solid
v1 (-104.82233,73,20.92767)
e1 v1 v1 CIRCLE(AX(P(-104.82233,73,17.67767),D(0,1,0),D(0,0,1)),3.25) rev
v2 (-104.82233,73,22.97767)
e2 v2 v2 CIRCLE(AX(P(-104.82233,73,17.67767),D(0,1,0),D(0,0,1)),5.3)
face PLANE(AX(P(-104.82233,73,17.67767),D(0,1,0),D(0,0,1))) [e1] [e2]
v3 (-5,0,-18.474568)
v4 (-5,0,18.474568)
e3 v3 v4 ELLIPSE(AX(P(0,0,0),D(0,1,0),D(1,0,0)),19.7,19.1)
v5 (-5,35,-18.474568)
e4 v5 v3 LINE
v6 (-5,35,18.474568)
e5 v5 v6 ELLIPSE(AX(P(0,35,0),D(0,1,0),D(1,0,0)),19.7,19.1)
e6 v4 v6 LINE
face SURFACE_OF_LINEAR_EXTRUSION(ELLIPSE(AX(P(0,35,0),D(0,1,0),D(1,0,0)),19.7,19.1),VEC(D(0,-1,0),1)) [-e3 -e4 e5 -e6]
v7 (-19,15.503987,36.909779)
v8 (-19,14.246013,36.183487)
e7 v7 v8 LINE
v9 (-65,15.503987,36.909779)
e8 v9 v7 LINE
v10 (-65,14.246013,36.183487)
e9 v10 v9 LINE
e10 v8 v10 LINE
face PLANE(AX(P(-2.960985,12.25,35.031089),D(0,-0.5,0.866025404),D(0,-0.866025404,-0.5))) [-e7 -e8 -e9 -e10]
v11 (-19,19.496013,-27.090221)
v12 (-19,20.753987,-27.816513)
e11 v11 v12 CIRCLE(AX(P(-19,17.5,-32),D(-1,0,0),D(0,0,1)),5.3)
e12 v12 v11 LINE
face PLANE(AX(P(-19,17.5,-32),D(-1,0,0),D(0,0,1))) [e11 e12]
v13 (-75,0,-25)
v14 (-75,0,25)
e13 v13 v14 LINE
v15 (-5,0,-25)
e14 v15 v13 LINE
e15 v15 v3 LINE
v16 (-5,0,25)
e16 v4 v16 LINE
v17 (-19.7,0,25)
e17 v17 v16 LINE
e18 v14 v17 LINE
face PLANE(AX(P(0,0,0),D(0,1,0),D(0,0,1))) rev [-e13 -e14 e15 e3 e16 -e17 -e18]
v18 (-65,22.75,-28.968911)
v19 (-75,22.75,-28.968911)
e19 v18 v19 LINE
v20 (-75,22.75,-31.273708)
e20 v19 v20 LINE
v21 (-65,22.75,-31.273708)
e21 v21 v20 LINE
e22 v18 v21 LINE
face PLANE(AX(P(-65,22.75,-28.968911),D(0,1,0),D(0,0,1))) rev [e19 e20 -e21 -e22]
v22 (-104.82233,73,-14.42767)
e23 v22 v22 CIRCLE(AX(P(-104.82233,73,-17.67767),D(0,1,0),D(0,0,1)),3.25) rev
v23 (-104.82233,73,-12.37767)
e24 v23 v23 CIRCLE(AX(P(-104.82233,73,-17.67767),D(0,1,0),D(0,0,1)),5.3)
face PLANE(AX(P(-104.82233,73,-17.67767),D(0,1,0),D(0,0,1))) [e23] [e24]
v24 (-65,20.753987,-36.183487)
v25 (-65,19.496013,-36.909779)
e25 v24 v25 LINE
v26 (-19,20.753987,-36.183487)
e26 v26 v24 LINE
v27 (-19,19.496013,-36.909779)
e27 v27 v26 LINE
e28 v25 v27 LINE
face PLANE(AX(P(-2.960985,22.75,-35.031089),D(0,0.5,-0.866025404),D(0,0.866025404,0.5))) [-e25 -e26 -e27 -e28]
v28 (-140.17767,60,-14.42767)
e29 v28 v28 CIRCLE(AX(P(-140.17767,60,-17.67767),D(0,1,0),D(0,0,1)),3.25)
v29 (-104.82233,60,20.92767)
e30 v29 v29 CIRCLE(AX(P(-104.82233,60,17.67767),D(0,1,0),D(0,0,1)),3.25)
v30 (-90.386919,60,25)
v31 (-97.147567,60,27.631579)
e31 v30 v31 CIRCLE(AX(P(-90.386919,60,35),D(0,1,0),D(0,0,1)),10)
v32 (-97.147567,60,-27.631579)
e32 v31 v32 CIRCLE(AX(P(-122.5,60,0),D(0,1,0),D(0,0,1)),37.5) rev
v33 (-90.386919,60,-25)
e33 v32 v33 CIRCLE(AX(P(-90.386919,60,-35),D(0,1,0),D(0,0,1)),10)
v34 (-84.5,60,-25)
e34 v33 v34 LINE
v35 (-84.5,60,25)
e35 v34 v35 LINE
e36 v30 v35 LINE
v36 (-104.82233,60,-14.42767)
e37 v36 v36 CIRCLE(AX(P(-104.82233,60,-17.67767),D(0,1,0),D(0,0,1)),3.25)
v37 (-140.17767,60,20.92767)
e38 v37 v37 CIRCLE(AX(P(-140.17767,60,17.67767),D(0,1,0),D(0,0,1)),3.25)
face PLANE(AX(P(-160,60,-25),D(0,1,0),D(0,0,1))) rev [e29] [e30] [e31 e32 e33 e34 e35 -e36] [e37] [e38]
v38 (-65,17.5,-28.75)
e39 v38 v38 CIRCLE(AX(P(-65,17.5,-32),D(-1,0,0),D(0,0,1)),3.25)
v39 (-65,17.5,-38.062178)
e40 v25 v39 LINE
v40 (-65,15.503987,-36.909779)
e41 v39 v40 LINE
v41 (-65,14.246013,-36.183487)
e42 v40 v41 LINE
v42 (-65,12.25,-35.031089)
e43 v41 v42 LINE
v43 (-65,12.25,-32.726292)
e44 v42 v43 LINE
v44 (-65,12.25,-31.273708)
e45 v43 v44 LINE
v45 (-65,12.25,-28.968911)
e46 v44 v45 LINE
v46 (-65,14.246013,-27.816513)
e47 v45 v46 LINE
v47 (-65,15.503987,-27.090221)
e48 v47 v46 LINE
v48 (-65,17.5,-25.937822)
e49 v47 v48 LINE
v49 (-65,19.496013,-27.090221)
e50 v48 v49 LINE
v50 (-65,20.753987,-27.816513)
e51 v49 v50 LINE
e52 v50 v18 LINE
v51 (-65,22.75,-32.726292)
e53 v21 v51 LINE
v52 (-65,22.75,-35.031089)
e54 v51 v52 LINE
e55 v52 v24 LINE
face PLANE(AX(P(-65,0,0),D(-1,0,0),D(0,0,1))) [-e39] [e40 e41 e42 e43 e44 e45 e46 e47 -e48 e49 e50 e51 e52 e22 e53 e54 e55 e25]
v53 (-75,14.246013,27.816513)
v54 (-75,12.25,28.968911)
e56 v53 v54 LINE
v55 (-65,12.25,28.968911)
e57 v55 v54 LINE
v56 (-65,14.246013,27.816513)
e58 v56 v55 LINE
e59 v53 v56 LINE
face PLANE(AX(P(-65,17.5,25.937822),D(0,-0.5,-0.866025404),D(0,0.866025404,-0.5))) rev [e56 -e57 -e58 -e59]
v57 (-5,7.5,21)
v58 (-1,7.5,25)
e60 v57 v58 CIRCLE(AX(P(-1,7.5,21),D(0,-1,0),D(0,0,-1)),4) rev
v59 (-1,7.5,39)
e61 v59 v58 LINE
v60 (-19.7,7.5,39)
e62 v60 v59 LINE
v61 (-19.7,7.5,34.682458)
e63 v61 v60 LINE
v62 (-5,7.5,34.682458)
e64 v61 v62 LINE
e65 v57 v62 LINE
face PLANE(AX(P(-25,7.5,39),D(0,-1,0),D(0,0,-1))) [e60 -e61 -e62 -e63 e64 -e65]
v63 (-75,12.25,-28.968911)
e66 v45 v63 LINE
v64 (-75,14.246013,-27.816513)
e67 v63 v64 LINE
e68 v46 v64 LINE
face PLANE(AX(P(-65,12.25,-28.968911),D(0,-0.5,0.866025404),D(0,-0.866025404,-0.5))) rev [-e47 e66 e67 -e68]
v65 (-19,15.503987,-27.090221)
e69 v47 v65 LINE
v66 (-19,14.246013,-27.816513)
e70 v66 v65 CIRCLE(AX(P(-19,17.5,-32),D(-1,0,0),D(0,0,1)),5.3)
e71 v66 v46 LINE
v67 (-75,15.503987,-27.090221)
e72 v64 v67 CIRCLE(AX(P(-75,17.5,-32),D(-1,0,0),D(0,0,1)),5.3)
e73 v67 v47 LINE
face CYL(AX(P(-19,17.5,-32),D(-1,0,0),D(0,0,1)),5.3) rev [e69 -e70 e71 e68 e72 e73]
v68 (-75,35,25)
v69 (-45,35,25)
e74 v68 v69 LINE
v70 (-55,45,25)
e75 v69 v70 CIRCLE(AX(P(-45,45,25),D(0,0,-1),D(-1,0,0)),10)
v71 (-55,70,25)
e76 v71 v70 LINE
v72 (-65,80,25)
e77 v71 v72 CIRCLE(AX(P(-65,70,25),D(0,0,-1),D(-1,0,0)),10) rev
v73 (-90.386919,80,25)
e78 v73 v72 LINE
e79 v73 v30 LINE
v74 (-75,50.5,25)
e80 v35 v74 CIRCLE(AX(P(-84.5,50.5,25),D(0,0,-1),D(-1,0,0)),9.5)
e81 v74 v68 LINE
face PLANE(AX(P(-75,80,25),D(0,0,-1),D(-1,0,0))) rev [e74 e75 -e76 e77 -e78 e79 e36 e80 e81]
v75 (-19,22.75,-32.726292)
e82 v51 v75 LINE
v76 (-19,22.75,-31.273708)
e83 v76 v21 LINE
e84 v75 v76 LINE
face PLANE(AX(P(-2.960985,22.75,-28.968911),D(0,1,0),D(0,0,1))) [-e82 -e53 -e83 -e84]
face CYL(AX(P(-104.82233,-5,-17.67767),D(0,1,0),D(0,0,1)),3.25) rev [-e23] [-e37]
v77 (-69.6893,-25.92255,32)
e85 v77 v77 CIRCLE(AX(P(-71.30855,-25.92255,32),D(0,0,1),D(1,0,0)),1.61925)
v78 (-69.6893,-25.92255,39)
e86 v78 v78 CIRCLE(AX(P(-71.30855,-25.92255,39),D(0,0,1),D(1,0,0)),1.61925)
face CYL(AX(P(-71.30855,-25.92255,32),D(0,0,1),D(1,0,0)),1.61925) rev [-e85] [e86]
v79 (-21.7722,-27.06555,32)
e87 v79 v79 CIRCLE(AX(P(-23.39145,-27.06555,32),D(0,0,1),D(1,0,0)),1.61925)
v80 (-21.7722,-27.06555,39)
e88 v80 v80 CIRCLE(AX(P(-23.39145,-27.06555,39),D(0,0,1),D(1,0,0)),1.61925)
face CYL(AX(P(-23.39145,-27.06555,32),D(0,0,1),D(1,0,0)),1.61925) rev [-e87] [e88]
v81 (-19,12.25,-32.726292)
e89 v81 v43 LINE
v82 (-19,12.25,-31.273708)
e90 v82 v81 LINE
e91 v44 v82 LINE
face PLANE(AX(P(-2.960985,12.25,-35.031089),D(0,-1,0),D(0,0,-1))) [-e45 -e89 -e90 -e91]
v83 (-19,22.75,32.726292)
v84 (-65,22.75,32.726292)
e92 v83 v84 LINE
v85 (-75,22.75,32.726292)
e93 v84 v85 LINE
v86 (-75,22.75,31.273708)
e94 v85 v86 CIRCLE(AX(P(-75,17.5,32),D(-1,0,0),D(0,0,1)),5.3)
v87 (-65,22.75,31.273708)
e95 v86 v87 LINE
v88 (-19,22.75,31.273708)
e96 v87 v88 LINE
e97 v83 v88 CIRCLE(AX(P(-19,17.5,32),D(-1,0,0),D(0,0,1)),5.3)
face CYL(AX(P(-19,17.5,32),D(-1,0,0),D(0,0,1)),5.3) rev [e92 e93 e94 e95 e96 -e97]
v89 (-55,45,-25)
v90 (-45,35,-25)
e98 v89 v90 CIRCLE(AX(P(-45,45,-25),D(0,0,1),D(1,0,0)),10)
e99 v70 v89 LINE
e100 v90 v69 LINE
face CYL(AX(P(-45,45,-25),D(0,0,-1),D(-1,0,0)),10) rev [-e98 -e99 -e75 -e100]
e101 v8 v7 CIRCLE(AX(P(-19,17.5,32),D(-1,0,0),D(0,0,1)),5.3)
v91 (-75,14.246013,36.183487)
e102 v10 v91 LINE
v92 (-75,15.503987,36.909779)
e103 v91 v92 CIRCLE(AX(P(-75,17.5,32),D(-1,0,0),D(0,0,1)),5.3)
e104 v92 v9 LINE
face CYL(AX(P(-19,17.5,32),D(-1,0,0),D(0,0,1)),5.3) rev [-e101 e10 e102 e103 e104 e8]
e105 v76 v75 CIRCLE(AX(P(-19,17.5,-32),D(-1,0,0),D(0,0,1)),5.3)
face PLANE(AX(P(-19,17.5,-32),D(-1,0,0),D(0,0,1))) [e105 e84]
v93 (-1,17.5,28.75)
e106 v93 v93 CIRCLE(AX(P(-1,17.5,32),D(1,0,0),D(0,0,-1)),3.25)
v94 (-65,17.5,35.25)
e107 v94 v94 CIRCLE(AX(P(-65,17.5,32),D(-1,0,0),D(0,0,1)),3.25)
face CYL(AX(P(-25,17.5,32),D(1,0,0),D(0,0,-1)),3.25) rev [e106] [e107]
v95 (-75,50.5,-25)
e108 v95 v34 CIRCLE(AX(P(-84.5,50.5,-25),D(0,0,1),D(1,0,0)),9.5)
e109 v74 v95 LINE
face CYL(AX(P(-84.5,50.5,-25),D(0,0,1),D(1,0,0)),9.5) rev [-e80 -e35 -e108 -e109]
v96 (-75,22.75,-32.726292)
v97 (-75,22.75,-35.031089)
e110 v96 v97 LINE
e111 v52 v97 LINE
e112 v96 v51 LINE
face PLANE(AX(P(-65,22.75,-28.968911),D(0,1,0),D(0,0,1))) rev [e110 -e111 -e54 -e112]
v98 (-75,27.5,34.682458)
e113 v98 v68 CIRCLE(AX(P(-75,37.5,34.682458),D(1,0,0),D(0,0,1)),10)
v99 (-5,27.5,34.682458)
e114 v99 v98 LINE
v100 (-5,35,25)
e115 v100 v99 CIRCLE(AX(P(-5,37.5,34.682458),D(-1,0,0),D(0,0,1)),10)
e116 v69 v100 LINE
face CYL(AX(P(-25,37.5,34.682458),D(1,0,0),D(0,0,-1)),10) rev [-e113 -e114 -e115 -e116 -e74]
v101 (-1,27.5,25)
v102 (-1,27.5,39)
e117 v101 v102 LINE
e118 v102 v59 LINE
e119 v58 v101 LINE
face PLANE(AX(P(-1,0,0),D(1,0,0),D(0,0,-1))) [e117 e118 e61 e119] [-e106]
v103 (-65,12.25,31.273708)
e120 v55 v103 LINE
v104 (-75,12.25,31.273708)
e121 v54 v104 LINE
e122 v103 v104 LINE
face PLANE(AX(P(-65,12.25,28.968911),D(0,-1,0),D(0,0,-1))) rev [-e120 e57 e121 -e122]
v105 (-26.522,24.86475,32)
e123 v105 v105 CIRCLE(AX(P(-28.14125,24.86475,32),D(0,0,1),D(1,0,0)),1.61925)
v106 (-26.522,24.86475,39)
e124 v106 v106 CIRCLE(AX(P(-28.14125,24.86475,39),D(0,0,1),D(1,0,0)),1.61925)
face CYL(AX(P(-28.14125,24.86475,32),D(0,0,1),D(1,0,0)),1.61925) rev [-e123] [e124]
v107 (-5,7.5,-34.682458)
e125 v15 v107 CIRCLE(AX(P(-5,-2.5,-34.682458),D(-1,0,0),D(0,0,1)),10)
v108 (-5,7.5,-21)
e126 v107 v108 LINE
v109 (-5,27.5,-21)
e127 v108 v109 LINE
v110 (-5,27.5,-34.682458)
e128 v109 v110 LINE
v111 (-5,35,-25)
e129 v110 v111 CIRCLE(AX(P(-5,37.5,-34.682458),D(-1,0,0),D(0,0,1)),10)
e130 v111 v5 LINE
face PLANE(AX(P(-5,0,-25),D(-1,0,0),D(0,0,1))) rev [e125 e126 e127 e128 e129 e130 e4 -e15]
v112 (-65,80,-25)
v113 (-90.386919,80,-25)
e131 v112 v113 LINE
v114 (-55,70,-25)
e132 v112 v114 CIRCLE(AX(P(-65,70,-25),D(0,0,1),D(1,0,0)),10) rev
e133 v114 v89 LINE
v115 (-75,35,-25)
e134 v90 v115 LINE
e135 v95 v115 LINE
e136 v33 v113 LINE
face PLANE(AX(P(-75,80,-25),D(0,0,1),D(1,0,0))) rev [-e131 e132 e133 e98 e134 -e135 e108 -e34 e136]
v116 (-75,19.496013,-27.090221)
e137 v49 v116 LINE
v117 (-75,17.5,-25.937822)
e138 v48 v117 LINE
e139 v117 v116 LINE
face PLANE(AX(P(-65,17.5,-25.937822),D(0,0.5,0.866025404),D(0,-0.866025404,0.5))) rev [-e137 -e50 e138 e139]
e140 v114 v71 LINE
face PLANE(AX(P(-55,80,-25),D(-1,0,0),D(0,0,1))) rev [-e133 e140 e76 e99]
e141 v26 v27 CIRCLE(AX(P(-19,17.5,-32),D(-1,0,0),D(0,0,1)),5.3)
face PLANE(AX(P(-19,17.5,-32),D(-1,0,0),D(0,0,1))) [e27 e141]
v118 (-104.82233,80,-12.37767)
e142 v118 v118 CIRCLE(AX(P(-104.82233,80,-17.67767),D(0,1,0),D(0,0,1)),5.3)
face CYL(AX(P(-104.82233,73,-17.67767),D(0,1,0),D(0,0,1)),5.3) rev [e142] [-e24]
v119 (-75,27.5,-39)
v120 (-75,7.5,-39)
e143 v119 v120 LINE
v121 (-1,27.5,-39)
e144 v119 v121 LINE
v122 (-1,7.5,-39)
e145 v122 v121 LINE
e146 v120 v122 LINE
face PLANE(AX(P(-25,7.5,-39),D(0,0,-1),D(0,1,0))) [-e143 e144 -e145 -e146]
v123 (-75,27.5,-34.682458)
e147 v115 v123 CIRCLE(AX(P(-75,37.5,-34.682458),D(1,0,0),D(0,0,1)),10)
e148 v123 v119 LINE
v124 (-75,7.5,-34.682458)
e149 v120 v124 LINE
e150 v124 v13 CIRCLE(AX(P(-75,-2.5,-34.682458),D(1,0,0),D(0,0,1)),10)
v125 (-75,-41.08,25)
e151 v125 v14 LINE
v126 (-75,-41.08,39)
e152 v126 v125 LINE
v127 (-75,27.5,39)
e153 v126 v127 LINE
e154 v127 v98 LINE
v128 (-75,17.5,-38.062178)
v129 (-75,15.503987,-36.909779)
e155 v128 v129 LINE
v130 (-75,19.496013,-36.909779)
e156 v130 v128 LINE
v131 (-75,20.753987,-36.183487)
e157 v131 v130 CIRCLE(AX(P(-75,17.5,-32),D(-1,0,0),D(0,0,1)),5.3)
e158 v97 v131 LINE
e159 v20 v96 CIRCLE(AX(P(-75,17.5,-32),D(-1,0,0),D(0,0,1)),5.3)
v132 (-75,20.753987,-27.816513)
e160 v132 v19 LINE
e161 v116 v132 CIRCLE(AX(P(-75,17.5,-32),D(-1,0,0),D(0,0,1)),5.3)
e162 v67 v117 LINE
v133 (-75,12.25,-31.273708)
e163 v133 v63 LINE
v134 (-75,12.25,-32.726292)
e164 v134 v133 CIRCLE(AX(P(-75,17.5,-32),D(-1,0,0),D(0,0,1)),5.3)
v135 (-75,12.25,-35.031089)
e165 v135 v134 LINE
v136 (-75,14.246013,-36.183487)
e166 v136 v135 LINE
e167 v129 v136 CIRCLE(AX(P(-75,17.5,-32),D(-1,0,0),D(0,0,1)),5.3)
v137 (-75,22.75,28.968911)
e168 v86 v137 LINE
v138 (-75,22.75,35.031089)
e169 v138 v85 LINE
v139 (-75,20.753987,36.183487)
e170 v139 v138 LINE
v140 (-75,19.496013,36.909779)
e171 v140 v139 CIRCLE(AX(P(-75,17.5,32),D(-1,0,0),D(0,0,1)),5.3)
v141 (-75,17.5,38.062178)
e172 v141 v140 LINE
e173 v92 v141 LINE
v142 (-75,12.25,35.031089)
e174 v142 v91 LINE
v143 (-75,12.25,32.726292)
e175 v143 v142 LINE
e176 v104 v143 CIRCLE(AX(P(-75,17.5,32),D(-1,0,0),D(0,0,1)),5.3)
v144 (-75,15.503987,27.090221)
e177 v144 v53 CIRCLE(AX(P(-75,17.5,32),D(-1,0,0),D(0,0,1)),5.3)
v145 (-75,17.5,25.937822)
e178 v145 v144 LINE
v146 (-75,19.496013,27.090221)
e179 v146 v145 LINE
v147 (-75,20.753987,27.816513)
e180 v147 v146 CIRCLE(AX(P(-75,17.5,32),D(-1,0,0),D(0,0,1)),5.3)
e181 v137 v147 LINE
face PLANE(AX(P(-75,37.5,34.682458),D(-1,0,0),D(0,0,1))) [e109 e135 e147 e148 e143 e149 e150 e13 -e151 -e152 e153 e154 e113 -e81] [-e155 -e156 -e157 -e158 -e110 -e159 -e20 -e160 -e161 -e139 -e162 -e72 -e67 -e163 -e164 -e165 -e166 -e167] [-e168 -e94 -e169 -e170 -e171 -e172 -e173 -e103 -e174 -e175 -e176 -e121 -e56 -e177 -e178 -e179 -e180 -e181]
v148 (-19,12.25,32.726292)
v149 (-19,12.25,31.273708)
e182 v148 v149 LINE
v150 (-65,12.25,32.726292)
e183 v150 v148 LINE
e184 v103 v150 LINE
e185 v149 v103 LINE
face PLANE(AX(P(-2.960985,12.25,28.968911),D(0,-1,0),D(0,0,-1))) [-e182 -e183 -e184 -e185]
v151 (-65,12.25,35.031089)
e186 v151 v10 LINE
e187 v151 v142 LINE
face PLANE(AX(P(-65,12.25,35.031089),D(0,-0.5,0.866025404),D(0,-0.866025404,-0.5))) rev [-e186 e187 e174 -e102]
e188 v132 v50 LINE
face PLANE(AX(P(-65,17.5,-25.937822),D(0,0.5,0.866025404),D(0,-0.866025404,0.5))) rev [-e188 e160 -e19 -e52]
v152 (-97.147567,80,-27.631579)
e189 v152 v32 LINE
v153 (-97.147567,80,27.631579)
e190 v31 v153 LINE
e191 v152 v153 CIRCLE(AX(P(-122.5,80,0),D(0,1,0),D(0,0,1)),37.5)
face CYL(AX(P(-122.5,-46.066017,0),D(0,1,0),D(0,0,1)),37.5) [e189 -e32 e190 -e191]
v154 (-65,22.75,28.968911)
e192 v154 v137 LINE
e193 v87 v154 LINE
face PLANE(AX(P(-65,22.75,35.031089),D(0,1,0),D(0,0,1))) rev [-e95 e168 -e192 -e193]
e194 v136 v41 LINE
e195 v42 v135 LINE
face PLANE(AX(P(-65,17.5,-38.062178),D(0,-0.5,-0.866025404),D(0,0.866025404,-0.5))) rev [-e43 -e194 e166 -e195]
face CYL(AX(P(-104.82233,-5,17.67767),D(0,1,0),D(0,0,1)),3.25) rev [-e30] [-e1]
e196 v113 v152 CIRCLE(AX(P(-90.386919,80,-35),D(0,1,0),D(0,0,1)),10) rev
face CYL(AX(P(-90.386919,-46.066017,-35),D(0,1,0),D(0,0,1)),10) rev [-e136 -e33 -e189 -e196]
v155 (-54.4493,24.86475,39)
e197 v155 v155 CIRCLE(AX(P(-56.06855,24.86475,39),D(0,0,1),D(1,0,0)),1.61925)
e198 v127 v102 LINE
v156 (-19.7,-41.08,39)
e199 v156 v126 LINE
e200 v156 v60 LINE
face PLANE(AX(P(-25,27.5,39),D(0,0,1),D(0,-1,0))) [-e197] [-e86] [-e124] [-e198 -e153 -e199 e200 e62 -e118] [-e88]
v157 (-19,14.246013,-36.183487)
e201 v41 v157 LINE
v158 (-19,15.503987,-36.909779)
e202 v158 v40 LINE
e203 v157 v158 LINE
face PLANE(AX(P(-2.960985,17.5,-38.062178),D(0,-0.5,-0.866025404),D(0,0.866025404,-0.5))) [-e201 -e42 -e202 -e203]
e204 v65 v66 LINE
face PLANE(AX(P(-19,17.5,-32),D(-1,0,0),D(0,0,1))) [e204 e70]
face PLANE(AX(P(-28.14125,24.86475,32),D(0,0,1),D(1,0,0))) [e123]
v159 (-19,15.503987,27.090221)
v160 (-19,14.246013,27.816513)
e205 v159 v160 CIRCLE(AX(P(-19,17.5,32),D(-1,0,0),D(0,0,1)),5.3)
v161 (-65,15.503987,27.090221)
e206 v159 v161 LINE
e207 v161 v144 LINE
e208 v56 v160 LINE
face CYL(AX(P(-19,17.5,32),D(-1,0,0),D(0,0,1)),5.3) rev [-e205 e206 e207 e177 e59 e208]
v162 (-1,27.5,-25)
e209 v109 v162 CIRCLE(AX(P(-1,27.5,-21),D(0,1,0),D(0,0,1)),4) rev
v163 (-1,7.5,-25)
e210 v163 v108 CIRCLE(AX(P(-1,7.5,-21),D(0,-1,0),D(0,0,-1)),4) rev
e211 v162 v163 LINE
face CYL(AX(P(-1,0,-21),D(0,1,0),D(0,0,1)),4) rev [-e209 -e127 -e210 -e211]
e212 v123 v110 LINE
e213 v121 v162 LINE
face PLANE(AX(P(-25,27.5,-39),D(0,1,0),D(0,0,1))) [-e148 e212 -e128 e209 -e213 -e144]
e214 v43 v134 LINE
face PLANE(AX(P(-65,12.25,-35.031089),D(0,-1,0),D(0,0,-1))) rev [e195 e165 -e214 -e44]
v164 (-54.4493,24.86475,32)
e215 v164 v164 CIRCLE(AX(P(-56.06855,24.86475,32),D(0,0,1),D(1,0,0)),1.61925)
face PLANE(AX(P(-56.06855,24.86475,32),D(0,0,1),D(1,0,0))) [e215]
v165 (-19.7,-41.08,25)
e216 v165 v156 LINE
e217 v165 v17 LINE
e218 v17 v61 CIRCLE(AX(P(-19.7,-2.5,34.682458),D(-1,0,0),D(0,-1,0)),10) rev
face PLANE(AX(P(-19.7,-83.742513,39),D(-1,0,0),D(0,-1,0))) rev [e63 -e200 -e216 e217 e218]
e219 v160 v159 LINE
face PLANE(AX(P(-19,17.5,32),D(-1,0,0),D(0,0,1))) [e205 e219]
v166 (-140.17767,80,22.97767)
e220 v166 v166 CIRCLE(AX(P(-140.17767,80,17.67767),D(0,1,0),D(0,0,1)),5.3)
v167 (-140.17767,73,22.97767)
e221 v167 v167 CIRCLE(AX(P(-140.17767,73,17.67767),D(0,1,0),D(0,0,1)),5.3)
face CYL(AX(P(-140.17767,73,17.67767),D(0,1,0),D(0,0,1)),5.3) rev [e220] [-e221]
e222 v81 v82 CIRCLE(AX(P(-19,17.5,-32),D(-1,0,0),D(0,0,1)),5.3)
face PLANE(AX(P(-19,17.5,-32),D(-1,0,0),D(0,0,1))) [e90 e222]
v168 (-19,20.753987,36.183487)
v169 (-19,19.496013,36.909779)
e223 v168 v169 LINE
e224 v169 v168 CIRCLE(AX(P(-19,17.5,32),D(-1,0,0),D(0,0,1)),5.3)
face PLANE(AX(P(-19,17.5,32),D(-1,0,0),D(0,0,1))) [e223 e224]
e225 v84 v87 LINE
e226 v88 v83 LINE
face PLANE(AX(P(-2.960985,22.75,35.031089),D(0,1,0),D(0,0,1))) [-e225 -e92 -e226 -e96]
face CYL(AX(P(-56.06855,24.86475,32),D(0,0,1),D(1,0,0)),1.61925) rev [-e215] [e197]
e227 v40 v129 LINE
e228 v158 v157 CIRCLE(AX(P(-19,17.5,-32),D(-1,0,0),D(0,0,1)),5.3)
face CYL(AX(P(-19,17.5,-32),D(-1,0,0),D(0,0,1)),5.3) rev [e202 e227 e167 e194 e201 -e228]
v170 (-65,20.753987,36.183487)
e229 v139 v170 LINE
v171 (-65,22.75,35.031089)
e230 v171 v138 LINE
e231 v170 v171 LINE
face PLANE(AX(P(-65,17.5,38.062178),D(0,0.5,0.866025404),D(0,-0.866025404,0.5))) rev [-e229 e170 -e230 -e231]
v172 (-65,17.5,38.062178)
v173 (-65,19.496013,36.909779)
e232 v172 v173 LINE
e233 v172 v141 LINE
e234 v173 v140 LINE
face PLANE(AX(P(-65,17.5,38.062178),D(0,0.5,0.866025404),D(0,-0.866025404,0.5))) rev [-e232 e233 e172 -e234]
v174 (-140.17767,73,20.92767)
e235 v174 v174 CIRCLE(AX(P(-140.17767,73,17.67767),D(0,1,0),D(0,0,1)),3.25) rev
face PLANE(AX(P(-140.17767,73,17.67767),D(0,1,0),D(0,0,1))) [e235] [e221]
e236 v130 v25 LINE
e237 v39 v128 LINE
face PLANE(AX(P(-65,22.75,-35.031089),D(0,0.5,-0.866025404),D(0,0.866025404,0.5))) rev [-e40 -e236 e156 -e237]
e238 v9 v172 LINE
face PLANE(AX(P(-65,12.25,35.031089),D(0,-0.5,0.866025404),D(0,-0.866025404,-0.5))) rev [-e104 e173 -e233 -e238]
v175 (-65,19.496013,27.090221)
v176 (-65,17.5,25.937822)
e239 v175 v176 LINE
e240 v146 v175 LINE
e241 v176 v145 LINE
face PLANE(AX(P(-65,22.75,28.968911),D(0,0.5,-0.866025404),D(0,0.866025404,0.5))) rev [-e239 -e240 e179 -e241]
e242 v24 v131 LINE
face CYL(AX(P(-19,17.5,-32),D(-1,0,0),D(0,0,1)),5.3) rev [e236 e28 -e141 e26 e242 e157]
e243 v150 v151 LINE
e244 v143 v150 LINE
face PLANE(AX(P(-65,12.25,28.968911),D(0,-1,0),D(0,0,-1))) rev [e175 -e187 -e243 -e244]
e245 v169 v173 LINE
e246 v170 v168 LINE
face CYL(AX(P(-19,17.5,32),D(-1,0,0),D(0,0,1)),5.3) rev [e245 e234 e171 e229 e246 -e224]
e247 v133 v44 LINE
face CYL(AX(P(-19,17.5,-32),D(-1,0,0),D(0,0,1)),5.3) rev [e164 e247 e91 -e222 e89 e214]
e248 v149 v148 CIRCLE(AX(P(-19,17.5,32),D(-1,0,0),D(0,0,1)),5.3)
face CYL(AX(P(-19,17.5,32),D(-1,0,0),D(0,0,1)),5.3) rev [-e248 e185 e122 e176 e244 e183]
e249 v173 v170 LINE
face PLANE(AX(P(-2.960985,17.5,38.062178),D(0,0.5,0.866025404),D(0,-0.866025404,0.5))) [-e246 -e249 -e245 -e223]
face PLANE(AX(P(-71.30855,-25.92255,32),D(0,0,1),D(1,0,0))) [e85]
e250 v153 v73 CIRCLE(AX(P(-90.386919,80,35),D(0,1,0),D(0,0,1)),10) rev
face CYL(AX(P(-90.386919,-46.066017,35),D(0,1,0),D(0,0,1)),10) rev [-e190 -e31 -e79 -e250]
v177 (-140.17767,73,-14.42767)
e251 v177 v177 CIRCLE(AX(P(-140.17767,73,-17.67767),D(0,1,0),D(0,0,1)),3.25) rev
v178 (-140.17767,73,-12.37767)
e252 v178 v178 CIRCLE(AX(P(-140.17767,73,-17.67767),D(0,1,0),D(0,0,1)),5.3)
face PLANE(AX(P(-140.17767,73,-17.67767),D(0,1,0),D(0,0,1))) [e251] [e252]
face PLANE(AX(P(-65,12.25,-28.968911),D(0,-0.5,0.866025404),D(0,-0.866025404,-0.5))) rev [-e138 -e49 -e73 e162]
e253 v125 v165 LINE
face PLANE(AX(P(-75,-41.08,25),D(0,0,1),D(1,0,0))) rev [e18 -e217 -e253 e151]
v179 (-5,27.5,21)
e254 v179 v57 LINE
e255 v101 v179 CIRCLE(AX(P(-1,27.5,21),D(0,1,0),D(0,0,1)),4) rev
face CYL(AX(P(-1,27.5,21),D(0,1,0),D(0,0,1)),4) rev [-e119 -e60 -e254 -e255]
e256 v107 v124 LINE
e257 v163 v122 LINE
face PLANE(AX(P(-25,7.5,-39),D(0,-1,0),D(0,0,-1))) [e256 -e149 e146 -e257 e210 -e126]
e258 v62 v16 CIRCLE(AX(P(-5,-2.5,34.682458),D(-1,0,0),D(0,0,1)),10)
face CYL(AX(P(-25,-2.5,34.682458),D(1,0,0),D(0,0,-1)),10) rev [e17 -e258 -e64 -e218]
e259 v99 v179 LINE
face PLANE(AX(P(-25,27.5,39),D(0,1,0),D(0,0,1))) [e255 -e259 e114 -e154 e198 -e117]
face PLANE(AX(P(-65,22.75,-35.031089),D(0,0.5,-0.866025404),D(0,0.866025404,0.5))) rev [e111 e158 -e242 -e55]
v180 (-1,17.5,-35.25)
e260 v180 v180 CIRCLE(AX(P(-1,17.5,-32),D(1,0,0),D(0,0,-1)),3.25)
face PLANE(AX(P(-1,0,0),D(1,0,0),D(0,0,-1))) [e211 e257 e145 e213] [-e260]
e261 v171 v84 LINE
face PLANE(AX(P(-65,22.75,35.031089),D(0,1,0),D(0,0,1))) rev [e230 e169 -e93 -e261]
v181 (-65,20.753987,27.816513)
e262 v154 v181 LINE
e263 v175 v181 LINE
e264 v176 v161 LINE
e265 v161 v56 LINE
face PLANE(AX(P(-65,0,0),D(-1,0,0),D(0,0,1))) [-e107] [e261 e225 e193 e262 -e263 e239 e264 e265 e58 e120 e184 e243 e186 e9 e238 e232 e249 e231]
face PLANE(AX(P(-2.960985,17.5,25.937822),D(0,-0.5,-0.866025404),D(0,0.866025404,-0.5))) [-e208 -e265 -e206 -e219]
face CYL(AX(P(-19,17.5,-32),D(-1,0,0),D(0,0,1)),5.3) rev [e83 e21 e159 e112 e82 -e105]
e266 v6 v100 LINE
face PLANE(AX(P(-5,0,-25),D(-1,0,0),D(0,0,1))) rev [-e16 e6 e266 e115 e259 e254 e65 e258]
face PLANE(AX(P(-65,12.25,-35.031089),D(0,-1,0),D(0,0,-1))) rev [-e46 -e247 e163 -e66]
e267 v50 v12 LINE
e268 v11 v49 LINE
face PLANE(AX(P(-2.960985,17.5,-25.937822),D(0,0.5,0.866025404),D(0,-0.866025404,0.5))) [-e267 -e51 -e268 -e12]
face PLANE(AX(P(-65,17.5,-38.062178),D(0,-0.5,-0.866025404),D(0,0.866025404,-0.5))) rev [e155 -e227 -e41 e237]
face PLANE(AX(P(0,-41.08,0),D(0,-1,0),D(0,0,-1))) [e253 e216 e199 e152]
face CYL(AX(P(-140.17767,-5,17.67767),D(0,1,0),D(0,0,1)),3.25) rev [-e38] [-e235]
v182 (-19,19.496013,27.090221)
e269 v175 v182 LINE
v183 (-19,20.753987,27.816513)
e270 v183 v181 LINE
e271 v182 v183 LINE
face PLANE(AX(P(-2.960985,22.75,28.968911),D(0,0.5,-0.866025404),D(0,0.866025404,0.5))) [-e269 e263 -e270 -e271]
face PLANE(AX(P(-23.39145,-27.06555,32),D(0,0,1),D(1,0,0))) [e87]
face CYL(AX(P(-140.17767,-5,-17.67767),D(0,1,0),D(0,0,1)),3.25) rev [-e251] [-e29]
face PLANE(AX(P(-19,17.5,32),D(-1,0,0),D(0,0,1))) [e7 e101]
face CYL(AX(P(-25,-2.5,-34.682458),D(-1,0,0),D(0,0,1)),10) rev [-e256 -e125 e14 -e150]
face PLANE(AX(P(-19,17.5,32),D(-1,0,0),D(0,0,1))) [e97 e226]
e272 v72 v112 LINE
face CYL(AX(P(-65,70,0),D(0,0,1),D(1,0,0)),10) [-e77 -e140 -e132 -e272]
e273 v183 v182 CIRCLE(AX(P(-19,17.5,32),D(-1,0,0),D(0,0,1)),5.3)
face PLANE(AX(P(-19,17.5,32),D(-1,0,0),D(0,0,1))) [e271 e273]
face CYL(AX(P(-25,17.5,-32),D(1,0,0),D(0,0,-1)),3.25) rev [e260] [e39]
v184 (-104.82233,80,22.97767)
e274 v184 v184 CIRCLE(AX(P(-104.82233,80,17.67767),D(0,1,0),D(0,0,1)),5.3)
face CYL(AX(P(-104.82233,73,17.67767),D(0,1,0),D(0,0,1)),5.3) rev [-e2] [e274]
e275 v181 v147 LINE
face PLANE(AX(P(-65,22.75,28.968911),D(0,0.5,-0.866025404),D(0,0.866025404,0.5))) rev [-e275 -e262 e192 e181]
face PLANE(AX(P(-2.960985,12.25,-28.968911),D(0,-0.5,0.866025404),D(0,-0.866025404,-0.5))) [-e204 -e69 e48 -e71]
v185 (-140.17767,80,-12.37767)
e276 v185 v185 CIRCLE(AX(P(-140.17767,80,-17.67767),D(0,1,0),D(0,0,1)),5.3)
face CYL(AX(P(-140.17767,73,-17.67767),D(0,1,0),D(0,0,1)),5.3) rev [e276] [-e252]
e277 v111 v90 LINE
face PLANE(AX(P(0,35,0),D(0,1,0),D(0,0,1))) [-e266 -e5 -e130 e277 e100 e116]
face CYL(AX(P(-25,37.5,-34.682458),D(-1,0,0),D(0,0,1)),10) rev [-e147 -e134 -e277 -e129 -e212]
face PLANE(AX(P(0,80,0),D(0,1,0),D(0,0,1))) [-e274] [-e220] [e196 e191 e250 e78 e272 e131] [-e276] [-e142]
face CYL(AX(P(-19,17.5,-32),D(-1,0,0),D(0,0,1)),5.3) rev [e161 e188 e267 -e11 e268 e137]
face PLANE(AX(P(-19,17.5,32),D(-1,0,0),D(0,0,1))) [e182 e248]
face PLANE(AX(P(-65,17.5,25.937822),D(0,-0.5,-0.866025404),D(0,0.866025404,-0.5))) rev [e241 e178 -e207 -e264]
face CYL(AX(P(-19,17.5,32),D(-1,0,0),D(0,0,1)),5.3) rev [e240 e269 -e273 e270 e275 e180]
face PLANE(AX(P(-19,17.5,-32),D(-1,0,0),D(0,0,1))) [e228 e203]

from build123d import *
from build123d.topology import SkipClean

# Parameters (mm, degrees)
SKETCH1_W                = 50
SKETCH1_H                = 50
SKETCH1_RX               = 19.7
SKETCH1_RY               = 19.1
BOSS_EXTRUDE1_DEPTH      = 35
SKETCH2_W                = 30
SKETCH2_H                = 50
CUT_EXTRUDE1_DEPTH       = 35
SKETCH3_W                = 13
SKETCH3_H                = 50
BOSS_EXTRUDE2_DEPTH      = 20
SKETCH4_R                = 1.5
CUT_EXTRUDE2_DEPTH       = 64.639610377
SKETCH5_W                = 36.974567712
SKETCH5_H                = 20
CUT_EXTRUDE3_DEPTH       = 20
BOSS_EXTRUDE3_DEPTH      = 4
BOSS_EXTRUDE3_DEPTH_BACK = 20
SKETCH6_W                = 14
SKETCH6_H                = 20
SKETCH6_R                = 3.25
SKETCH7_R                = 5.3
SKETCH7_R_2              = 3
CUT_EXTRUDE4_DEPTH       = 6
SKETCH8_W                = 13
SKETCH8_H                = 13.025432288
CUT_EXTRUDE5_DEPTH       = 30
FILLET6_R                = 4
FILLET5_R                = 10
SKETCH9_R                = 5.3
BOSS_EXTRUDE4_DEPTH      = 50
SKETCH10_W               = 20
SKETCH10_H               = 50
BOSS_EXTRUDE5_DEPTH      = 45
FILLET7_R                = 10
SKETCH11_W               = 50
SKETCH11_H               = 20
BOSS_EXTRUDE6_DEPTH      = 85
SKETCH13_R               = 37.5
BOSS_EXTRUDE7_DEPTH      = 20
FILLET8_R                = 9.5
CUT_EXTRUDE6_DEPTH       = 85
FILLET9_R                = 10
FILLET10_R               = 10
SKETCH14_R               = 3.25
CUT_EXTRUDE7_DEPTH       = 85
SKETCH15_R               = 5.3
CUT_EXTRUDE8_DEPTH       = 7
SKETCH16_R               = 3.25
BOSS_EXTRUDE9_DEPTH      = 56
SKETCH16_3_R             = 3.25
CUT_EXTRUDE11_DEPTH      = 10
SKETCH17_W               = 15
SKETCH17_H               = 14
BOSS_EXTRUDE10_DEPTH     = 7.5
SKETCH18_W               = 15
SKETCH18_H               = 14
BOSS_EXTRUDE11_DEPTH     = 41.08
BOSS_EXTRUDE12_REACH     = 181.937
SKETCH20_W               = 40.3
SKETCH20_H               = 14
SKETCH21_R               = 1.61925
CUT_EXTRUDE13_DEPTH      = 7


# Some blends are built 0.0001 mm under size
with BuildPart() as part:
    # Sketch1 → Boss-Extrude1 (new body)
    with BuildSketch(Plane(origin=(0, 0, 0), x_dir=(1, 0, 0), z_dir=(0, 1, 0))):
        Rectangle(SKETCH1_W, SKETCH1_H)
        with Locations((0, 0)):
            Ellipse(SKETCH1_RX, SKETCH1_RY, mode=Mode.SUBTRACT)
    extrude(amount=BOSS_EXTRUDE1_DEPTH)

    # Sketch2 → Cut-Extrude1 (cut)
    with BuildSketch(Plane(origin=(0, 35, 0), x_dir=(1, 0, 0), z_dir=(0, 1, 0))):
        with Locations((10, 0)):
            Rectangle(SKETCH2_W, SKETCH2_H)
    extrude(amount=-CUT_EXTRUDE1_DEPTH, mode=Mode.SUBTRACT)

    # Sketch3 → Boss-Extrude2 (add)
    with BuildSketch(Plane(origin=(0, 35, 0), x_dir=(1, 0, 0), z_dir=(0, 1, 0))):
        with Locations((-18.5, 0)):
            Rectangle(SKETCH3_W, SKETCH3_H)
    extrude(amount=BOSS_EXTRUDE2_DEPTH)

    # Sketch4 → Cut-Extrude2 (cut, through all)
    with BuildSketch(Plane.ZY.offset(25)):
        with Locations((18.474567712, 50)):
            Circle(SKETCH4_R)
    extrude(amount=-CUT_EXTRUDE2_DEPTH, mode=Mode.SUBTRACT)

    # Sketch5 → Cut-Extrude3 (cut)
    with BuildSketch(Plane(origin=(-12, 55, -25), x_dir=(0, 0, 1), z_dir=(-1, 0, 0))):
        with Locations((18.487283856, -10)):
            Rectangle(SKETCH5_W, SKETCH5_H)
    extrude(amount=CUT_EXTRUDE3_DEPTH, mode=Mode.SUBTRACT)

    # Sketch6 → Boss-Extrude3 (add, two sides: drawn at the far end of the back side and taken through both)
    # profile 1 of 2: a face of its own
    with BuildSketch(Plane(origin=(-5, 0, 0), x_dir=(0, 0, -1), z_dir=(1, 0, 0)).offset(-BOSS_EXTRUDE3_DEPTH_BACK)):
        with Locations((-32, 17.5)):
            Rectangle(SKETCH6_W, SKETCH6_H)
        with Locations((-32, 17.5)):
            Circle(SKETCH6_R, mode=Mode.SUBTRACT)
    # profile 2 of 2: a face of its own
    with BuildSketch(Plane(origin=(-5, 0, 0), x_dir=(0, 0, -1), z_dir=(1, 0, 0)).offset(-BOSS_EXTRUDE3_DEPTH_BACK)):
        with Locations((32, 17.5)):
            Rectangle(SKETCH6_W, SKETCH6_H)
        with Locations((32, 17.5)):
            Circle(SKETCH6_R, mode=Mode.SUBTRACT)
    extrude(amount=BOSS_EXTRUDE3_DEPTH + BOSS_EXTRUDE3_DEPTH_BACK)

    # Sketch7 → Cut-Extrude4 (cut)
    with BuildSketch(Plane.ZY.offset(25)):
        with Locations((-32, 17.5)):
            Circle(SKETCH7_R)
        with Locations((32, 17.5)):
            Circle(SKETCH7_R)
        with Locations((18.474567712, 50)):
            Circle(SKETCH7_R_2)
    extrude(amount=-CUT_EXTRUDE4_DEPTH, mode=Mode.SUBTRACT)

    # Sketch8 → Cut-Extrude5 (cut)
    with BuildSketch(Plane(origin=(0, 35, 0), x_dir=(1, 0, 0), z_dir=(0, 1, 0))):
        with Locations((-18.5, -18.487283856)):
            Rectangle(SKETCH8_W, SKETCH8_H)
    extrude(amount=CUT_EXTRUDE5_DEPTH, mode=Mode.SUBTRACT)

    # Fillet6
    fillet6_edges = [part.edges().sort_by_distance(p)[0] for p in [
        (-5, 17.5, 25),
        (-5, 17.5, -25),
    ]]
    fillet(fillet6_edges, radius=FILLET6_R - 0.0001)  # a hair under: the kernel refuses the full size

    # Fillet5
    # the kernel refuses this fillet: 10 mm, written as the material it adds along each edge
    with BuildSketch(Plane(origin=(-5, 7.5, 25), x_dir=(0, -1, 0), z_dir=(-1, 0, 0))) as fillet5_piece_1:
        with BuildLine():
            CenterArc((10, 9.682458366), FILLET5_R, 180, 75.522487814)
            Line((0, 9.682458366), (0, 0))
            Line((0, 0), (7.5, 0))
        make_face()
    extrude(amount=20)
    with BuildSketch(Plane(origin=(-5, 27.5, 25), x_dir=(0, 0, 1), z_dir=(-1, 0, 0)), Plane(origin=(-5, 7.5, -25), x_dir=(0, 0, -1), z_dir=(-1, 0, 0))) as fillet5_piece_2:
        with BuildLine():
            CenterArc((9.682458366, 10), FILLET5_R, 194.477512186, 75.522487814)
            Line((0, 7.5), (0, 0))
            Line((0, 0), (9.682458366, 0))
        make_face()
    extrude(amount=20)
    with BuildSketch(Plane(origin=(-5, 27.5, -25), x_dir=(0, 0, -1), z_dir=(-1, 0, 0))) as fillet5_piece_3:
        with BuildLine():
            CenterArc((9.682458366, -10), FILLET5_R, 90, 75.522487814)
            Line((0, -7.5), (0, 0))
            Line((0, 0), (9.682458366, 0))
        make_face()
    extrude(amount=20)

    # Sketch9 → Boss-Extrude4 (add)
    with BuildSketch(Plane.ZY.offset(25)):
        with BuildLine():
            Line((39, 27.5), (34.682458366, 27.5))
            ThreePointArc((34.682458366, 27.5), (28.558734009, 29.59430585), (25, 35))
            Line((25, 35), (-25, 35))
            ThreePointArc((-25, 35), (-28.558734009, 29.59430585), (-34.682458366, 27.5))
            Line((-34.682458366, 27.5), (-39, 27.5))
            Line((-39, 27.5), (-39, 7.5))
            Line((-39, 7.5), (-34.682458366, 7.5))
            ThreePointArc((-34.682458366, 7.5), (-28.558734009, 5.40569415), (-25, 0))
            Line((-25, 0), (25, 0))
            ThreePointArc((25, 0), (28.558734009, 5.40569415), (34.682458366, 7.5))
            Line((34.682458366, 7.5), (39, 7.5))
            Line((39, 7.5), (39, 27.5))
        make_face()
        with Locations((32, 17.5)):
            Circle(SKETCH9_R, mode=Mode.SUBTRACT)
        with Locations((-32, 17.5)):
            Circle(SKETCH9_R, mode=Mode.SUBTRACT)
    extrude(amount=BOSS_EXTRUDE4_DEPTH)

    # Sketch10 → Boss-Extrude5 (add)
    with SkipClean():  # the faces are left unmerged after this step: merging them gives an invalid solid
        with BuildSketch(Plane(origin=(0, 35, 0), x_dir=(1, 0, 0), z_dir=(0, 1, 0))):
            with Locations((-65, 0)):
                Rectangle(SKETCH10_W, SKETCH10_H)
        extrude(amount=BOSS_EXTRUDE5_DEPTH)

    # Fillet7
    fillet7_edges = [part.edges().sort_by_distance(p)[0] for p in [
        (-55, 35, 0),
    ]]
    fillet(fillet7_edges, radius=FILLET7_R)

    # Sketch11 → Boss-Extrude6 (add)
    with SkipClean():  # the faces are left unmerged after this step: merging them gives an invalid solid
        with BuildSketch(Plane.ZY.offset(75)):
            with Locations((0, 70)):
                Rectangle(SKETCH11_W, SKETCH11_H)
        extrude(amount=BOSS_EXTRUDE6_DEPTH)

    # Sketch13 → Boss-Extrude7 (add)
    with SkipClean():  # the faces are left unmerged after this step: merging them gives an invalid solid
        with BuildSketch(Plane(origin=(0, 80, 0), x_dir=(1, 0, 0), z_dir=(0, 1, 0))):
            with Locations((-122.5, 0)):
                Circle(SKETCH13_R)
        extrude(amount=-BOSS_EXTRUDE7_DEPTH)

    # Fillet8
    fillet8_edges = [part.edges().sort_by_distance(p)[0] for p in [
        (-75, 60, 0),
    ]]
    fillet(fillet8_edges, radius=FILLET8_R)

    # Sketch13<3> → Cut-Extrude6 (cut)
    with SkipClean():  # the faces are left unmerged after this step: merging them gives an invalid solid
        with BuildSketch(Plane(origin=(0, 80, 0), x_dir=(1, 0, 0), z_dir=(0, 1, 0))):
            with BuildLine():
                ThreePointArc((-150.450849719, -25), (-157.531463473, -13.380828335), (-160, 6.6e-08))
                Line((-160, 6.6e-08), (-160, -25))
                Line((-160, -25), (-150.450849719, -25))
            make_face()
            with BuildLine():
                Line((-150.450849719, 25), (-160, 25))
                Line((-160, 25), (-160, -2.4e-07))
                ThreePointArc((-160, -2.4e-07), (-157.531463504, 13.380828254), (-150.450849719, 25))
            make_face()
        extrude(amount=-CUT_EXTRUDE6_DEPTH, mode=Mode.SUBTRACT)

    # Fillet9
    fillet9_edges = [part.edges().sort_by_distance(p)[0] for p in [
        (-94.549150281, 70, 25),
        (-94.549150281, 70, -25),
    ]]
    fillet(fillet9_edges, radius=FILLET9_R)

    # Fillet10
    fillet10_edges = [part.edges().sort_by_distance(p)[0] for p in [
        (-55, 80, 0),
    ]]
    fillet(fillet10_edges, radius=FILLET10_R)

    # Sketch14 → Cut-Extrude7 (cut)
    with SkipClean():  # the faces are left unmerged after this step: merging them gives an invalid solid
        with BuildSketch(Plane(origin=(0, 80, 0), x_dir=(1, 0, 0), z_dir=(0, 1, 0))):
            with Locations(Location((-140.17766953, 17.67766953, 0), (0, 0, 270))):
                Circle(SKETCH14_R)
            with Locations(Location((-140.17766953, -17.67766953, 0), (0, 0, 270))):
                Circle(SKETCH14_R)
            with Locations(Location((-104.82233047, -17.67766953, 0), (0, 0, 270))):
                Circle(SKETCH14_R)
            with Locations(Location((-104.82233047, 17.67766953, 0), (0, 0, 270))):
                Circle(SKETCH14_R)
        extrude(amount=-CUT_EXTRUDE7_DEPTH, mode=Mode.SUBTRACT)

    # Sketch15 → Cut-Extrude8 (cut)
    with SkipClean():  # the faces are left unmerged after this step: merging them gives an invalid solid
        with BuildSketch(Plane(origin=(0, 80, 0), x_dir=(1, 0, 0), z_dir=(0, 1, 0))):
            with Locations(Location((-140.17766953, 17.67766953, 0), (0, 0, 270))):
                Circle(SKETCH15_R)
            with Locations(Location((-140.17766953, -17.67766953, 0), (0, 0, 270))):
                Circle(SKETCH15_R)
            with Locations(Location((-104.82233047, -17.67766953, 0), (0, 0, 270))):
                Circle(SKETCH15_R)
            with Locations(Location((-104.82233047, 17.67766953, 0), (0, 0, 270))):
                Circle(SKETCH15_R)
        extrude(amount=-CUT_EXTRUDE8_DEPTH, mode=Mode.SUBTRACT)

    # Sketch16 → Boss-Extrude9 (add)
    # profile 1 of 2: a face of its own
    with SkipClean():  # the faces are left unmerged after this step: merging them gives an invalid solid
        with BuildSketch(Plane.ZY.offset(75)):
            Polygon((-25.937822174, 17.5), (-28.968911087, 22.75), (-35.031088913, 22.75), (-38.062177826, 17.5), (-35.031088913, 12.25), (-28.968911087, 12.25), align=None)
            with Locations(Location((-32, 17.5, 0), (0, 0, 180))):
                Circle(SKETCH16_R, mode=Mode.SUBTRACT)
        # profile 2 of 2: a face of its own
        with BuildSketch(Plane.ZY.offset(75)):
            Polygon((25.937822174, 17.5), (28.968911087, 12.25), (35.031088913, 12.25), (38.062177826, 17.5), (35.031088913, 22.75), (28.968911087, 22.75), align=None)
            with Locations(Location((32, 17.5, 0), (0, 0, 180))):
                Circle(SKETCH16_R, mode=Mode.SUBTRACT)
        extrude(amount=-BOSS_EXTRUDE9_DEPTH)

    # Sketch16<3> → Cut-Extrude11 (cut)
    # profile 1 of 2: a face of its own
    with SkipClean():  # the faces are left unmerged after this step: merging them gives an invalid solid
        with BuildSketch(Plane.ZY.offset(75)):
            Polygon((-25.937822174, 17.5), (-28.968911087, 22.75), (-35.031088913, 22.75), (-38.062177826, 17.5), (-35.031088913, 12.25), (-28.968911087, 12.25), align=None)
            with Locations(Location((-32, 17.5, 0), (0, 0, 180))):
                Circle(SKETCH16_3_R, mode=Mode.SUBTRACT)
        # profile 2 of 2: a face of its own
        with BuildSketch(Plane.ZY.offset(75)):
            Polygon((25.937822174, 17.5), (28.968911087, 12.25), (35.031088913, 12.25), (38.062177826, 17.5), (35.031088913, 22.75), (28.968911087, 22.75), align=None)
            with Locations(Location((32, 17.5, 0), (0, 0, 180))):
                Circle(SKETCH16_3_R, mode=Mode.SUBTRACT)
        extrude(amount=-CUT_EXTRUDE11_DEPTH, mode=Mode.SUBTRACT)

    # Sketch17 → Boss-Extrude10 (add)
    with SkipClean():  # the faces are left unmerged after this step: merging them gives an invalid solid
        with BuildSketch(Plane.XZ):
            with Locations((-67.5, 32)):
                Rectangle(SKETCH17_W, SKETCH17_H)
        extrude(amount=-BOSS_EXTRUDE10_DEPTH)

    # Sketch18 → Boss-Extrude11 (add)
    with SkipClean():  # the faces are left unmerged after this step: merging them gives an invalid solid
        with BuildSketch(Plane.XZ):
            with Locations((-67.5, 32)):
                Rectangle(SKETCH18_W, SKETCH18_H)
        extrude(amount=BOSS_EXTRUDE11_DEPTH)

    # Boss-Extrude12: up to this face of the body (flat: up to its plane)
    boss_extrude12_end = Plane(part.part.faces().sort_by_distance((-67.5, -41.08, 32))[0])
    # Sketch20 → Boss-Extrude12 (add, up to the picked face)
    with BuildSketch(Plane.XZ.offset(-7.5), mode=Mode.PRIVATE) as boss_extrude12_sk1:
        with Locations((-39.85, 32)):
            Rectangle(SKETCH20_W, SKETCH20_H)
    boss_extrude12_tool1 = split(extrude(boss_extrude12_sk1.sketch, amount=BOSS_EXTRUDE12_REACH, mode=Mode.PRIVATE), bisect_by=boss_extrude12_end, keep=Keep.BOTH, mode=Mode.PRIVATE)
    add(boss_extrude12_tool1.solids().sort_by(Axis((-39.85, 7.5, 32), (0, -1, 0)))[0])

    # Sketch21 → Cut-Extrude13 (cut)
    with SkipClean():  # the faces are left unmerged after this step: merging them gives an invalid solid
        with BuildSketch(Plane.XY.offset(39)):
            with Locations((-56.06855, 24.86475)):
                Circle(SKETCH21_R)
            with Locations((-28.14125, 24.86475)):
                Circle(SKETCH21_R)
            with Locations((-71.30855, -25.92255)):
                Circle(SKETCH21_R)
            with Locations((-23.39145, -27.06555)):
                Circle(SKETCH21_R)
        extrude(amount=-CUT_EXTRUDE13_DEPTH, mode=Mode.SUBTRACT)


solid = part.part
